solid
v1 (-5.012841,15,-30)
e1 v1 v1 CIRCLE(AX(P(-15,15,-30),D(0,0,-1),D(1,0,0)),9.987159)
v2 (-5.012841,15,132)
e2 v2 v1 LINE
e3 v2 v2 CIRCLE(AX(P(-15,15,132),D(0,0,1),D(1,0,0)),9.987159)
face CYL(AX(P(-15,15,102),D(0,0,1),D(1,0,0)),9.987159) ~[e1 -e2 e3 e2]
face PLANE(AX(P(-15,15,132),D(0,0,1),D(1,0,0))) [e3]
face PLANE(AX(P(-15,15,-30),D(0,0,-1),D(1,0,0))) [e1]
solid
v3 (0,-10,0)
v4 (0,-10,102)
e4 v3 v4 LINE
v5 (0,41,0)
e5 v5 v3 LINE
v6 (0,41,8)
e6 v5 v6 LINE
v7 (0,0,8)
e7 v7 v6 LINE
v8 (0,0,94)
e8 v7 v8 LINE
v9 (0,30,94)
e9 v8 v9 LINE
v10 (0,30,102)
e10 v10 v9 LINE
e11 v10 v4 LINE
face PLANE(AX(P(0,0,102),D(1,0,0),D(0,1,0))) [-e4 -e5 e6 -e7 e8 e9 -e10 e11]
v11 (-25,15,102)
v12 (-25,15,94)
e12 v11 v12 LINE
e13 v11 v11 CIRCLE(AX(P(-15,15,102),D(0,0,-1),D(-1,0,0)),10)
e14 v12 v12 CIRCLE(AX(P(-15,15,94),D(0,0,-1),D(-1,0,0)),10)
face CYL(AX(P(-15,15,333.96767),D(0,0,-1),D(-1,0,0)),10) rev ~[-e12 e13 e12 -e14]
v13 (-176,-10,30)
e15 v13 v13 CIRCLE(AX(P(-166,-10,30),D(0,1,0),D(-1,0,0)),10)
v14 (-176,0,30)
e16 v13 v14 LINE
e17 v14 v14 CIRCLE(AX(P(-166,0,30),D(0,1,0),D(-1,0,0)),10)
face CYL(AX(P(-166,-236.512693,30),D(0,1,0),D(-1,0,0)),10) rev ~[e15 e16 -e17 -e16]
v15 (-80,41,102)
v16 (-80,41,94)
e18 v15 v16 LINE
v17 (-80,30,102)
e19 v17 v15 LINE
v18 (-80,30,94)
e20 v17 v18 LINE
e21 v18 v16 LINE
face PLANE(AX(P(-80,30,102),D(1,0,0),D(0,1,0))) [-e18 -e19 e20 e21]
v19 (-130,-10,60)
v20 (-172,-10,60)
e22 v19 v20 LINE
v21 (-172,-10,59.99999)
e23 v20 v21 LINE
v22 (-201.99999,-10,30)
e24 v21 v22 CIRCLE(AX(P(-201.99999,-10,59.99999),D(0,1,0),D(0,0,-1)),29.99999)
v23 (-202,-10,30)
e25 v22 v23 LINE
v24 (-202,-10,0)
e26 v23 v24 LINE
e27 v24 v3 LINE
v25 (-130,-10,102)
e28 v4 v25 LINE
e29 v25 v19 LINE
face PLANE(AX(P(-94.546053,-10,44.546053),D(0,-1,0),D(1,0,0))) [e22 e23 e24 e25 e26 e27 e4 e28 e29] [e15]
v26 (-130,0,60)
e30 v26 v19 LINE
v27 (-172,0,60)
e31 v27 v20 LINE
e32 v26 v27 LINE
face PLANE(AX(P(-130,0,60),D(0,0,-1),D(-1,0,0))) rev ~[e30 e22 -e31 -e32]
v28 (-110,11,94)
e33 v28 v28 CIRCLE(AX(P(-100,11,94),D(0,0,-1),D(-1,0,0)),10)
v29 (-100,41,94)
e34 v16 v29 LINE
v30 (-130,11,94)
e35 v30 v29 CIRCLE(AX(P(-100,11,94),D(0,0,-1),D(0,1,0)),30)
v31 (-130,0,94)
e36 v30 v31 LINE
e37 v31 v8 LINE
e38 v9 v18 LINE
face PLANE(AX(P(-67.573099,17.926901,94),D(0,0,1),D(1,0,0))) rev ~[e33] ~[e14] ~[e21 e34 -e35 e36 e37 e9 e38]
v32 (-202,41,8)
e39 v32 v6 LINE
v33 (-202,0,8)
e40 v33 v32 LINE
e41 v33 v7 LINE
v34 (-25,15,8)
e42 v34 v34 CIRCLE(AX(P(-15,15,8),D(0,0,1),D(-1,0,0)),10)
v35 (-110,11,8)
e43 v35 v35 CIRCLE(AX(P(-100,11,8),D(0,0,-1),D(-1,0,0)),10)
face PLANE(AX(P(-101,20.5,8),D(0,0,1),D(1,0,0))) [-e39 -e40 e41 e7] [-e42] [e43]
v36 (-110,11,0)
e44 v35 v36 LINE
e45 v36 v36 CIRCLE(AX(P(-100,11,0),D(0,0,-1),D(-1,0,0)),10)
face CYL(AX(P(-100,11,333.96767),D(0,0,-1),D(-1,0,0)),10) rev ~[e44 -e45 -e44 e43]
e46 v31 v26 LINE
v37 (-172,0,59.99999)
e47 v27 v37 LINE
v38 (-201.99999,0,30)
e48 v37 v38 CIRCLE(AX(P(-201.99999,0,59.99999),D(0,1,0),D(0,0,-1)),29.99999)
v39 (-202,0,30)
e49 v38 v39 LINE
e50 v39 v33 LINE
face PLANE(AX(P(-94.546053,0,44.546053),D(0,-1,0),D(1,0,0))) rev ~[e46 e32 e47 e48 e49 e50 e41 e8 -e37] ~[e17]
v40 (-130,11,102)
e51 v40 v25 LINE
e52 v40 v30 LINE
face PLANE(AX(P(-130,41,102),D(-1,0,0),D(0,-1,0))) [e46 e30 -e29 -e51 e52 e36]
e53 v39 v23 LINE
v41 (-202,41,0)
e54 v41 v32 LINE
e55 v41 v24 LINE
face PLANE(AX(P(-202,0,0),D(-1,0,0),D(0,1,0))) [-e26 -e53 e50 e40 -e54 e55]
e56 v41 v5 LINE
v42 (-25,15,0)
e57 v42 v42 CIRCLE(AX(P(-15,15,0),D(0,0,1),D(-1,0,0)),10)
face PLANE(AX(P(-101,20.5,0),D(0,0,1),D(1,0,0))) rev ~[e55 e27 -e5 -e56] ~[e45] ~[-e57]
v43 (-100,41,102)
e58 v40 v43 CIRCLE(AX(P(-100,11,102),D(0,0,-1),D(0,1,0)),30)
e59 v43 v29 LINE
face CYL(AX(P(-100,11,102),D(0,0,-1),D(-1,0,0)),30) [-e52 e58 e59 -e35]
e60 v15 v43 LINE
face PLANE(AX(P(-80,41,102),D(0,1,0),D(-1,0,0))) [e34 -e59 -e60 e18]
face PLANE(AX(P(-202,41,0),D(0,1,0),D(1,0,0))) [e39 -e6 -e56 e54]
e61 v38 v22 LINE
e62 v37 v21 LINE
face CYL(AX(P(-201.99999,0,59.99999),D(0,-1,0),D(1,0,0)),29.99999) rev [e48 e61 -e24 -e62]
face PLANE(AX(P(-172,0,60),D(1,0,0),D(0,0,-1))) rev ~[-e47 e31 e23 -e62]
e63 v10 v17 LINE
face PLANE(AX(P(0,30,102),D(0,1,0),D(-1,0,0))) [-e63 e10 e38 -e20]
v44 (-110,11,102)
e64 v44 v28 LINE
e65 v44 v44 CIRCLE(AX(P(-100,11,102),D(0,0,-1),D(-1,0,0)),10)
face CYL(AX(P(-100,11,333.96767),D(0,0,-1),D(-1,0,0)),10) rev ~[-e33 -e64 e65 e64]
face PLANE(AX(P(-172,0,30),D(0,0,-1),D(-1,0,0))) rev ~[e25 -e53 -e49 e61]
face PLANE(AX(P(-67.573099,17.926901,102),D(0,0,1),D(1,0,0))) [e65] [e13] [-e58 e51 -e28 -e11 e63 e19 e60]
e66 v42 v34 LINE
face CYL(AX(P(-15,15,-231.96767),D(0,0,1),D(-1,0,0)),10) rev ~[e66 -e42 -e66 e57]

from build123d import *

# Parameters (mm, degrees)
F1_DEPTH  = 10
F2_R      = 29.99999
F4_D      = 20
F5_W      = 202
F5_H      = 41
F6_DEPTH  = 8
F8_D      = 20
F10_DEPTH = 8
F11_R     = 30
F13_D     = 20
F14_D     = 20
F15_R     = 9.9871589088
F16_DEPTH = 30
F17_R     = 9.9871589088
F18_DEPTH = 132


# Not quite as in the source:
# - a fillet or chamfer is up to 0.001 mm smaller than in the source, because OpenCascade refuses the exact size


with BuildPart() as f1:
    # F0 (on Front) → F1 (new body)
    with BuildSketch(Plane.XZ):
        Polygon((-202, 0), (0, 0), (0, 102), (-130, 102), (-130, 60), (-172, 60), (-172, 30), (-202, 30), align=None)
    extrude(amount=F1_DEPTH)

    # F2 (radius 30 in the source; OpenCascade refuses exactly that, so slightly less here)
    f2_edges = [f1.edges().sort_by_distance(p)[0] for p in [
        (-172, -5, 30),
    ]]
    fillet(f2_edges, radius=F2_R)

    # F4 (through all)
    with Locations(Plane.XZ.offset(10)):
        with Locations((-166, 30)):
            Hole(F4_D / 2)

    # F5 (on Top) → F6 (join)
    with BuildSketch(Plane.XY):
        with Locations((-101, 20.5)):
            Rectangle(F5_W, F5_H)
    extrude(amount=F6_DEPTH)

    # F8 (through all)
    with Locations(Plane(origin=(0, 0, 0), x_dir=(1, 0, 0), z_dir=(0, 0, -1))):
        with Locations((-15, -15)):
            Hole(F8_D / 2)

    # F9 (on face) → F10 (join)
    with BuildSketch(Plane.XY.offset(102)):
        Polygon((-130, 0), (0, 0), (0, 30), (-80, 30), (-80, 41), (-130, 41), align=None)
    extrude(amount=-F10_DEPTH)

    # F11
    f11_edges = [f1.edges().sort_by_distance(p)[0] for p in [
        (-130, 41, 98),
    ]]
    fillet(f11_edges, radius=F11_R)

    # F13 (through all)
    with Locations(Plane.XY.offset(102)):
        with Locations((-100, 11)):
            Hole(F13_D / 2)

    # F14 (through all)
    with Locations(Plane.XY.offset(102)):
        with Locations((-15, 15)):
            Hole(F14_D / 2)


with BuildPart() as f16:
    # F15 (on face) → F16 (new body)
    with BuildSketch(Plane.XY.offset(102)):
        with Locations((-15, 15)):
            Circle(F15_R)
    extrude(amount=F16_DEPTH)

    # F17 (on face) → F18 (join)
    with BuildSketch(Plane(origin=(0, 0, 102), x_dir=(1, 0, 0), z_dir=(0, 0, -1))):
        with Locations((-15, -15)):
            Circle(F17_R)
    extrude(amount=F18_DEPTH)


solid = Compound([f1.part, f16.part])
